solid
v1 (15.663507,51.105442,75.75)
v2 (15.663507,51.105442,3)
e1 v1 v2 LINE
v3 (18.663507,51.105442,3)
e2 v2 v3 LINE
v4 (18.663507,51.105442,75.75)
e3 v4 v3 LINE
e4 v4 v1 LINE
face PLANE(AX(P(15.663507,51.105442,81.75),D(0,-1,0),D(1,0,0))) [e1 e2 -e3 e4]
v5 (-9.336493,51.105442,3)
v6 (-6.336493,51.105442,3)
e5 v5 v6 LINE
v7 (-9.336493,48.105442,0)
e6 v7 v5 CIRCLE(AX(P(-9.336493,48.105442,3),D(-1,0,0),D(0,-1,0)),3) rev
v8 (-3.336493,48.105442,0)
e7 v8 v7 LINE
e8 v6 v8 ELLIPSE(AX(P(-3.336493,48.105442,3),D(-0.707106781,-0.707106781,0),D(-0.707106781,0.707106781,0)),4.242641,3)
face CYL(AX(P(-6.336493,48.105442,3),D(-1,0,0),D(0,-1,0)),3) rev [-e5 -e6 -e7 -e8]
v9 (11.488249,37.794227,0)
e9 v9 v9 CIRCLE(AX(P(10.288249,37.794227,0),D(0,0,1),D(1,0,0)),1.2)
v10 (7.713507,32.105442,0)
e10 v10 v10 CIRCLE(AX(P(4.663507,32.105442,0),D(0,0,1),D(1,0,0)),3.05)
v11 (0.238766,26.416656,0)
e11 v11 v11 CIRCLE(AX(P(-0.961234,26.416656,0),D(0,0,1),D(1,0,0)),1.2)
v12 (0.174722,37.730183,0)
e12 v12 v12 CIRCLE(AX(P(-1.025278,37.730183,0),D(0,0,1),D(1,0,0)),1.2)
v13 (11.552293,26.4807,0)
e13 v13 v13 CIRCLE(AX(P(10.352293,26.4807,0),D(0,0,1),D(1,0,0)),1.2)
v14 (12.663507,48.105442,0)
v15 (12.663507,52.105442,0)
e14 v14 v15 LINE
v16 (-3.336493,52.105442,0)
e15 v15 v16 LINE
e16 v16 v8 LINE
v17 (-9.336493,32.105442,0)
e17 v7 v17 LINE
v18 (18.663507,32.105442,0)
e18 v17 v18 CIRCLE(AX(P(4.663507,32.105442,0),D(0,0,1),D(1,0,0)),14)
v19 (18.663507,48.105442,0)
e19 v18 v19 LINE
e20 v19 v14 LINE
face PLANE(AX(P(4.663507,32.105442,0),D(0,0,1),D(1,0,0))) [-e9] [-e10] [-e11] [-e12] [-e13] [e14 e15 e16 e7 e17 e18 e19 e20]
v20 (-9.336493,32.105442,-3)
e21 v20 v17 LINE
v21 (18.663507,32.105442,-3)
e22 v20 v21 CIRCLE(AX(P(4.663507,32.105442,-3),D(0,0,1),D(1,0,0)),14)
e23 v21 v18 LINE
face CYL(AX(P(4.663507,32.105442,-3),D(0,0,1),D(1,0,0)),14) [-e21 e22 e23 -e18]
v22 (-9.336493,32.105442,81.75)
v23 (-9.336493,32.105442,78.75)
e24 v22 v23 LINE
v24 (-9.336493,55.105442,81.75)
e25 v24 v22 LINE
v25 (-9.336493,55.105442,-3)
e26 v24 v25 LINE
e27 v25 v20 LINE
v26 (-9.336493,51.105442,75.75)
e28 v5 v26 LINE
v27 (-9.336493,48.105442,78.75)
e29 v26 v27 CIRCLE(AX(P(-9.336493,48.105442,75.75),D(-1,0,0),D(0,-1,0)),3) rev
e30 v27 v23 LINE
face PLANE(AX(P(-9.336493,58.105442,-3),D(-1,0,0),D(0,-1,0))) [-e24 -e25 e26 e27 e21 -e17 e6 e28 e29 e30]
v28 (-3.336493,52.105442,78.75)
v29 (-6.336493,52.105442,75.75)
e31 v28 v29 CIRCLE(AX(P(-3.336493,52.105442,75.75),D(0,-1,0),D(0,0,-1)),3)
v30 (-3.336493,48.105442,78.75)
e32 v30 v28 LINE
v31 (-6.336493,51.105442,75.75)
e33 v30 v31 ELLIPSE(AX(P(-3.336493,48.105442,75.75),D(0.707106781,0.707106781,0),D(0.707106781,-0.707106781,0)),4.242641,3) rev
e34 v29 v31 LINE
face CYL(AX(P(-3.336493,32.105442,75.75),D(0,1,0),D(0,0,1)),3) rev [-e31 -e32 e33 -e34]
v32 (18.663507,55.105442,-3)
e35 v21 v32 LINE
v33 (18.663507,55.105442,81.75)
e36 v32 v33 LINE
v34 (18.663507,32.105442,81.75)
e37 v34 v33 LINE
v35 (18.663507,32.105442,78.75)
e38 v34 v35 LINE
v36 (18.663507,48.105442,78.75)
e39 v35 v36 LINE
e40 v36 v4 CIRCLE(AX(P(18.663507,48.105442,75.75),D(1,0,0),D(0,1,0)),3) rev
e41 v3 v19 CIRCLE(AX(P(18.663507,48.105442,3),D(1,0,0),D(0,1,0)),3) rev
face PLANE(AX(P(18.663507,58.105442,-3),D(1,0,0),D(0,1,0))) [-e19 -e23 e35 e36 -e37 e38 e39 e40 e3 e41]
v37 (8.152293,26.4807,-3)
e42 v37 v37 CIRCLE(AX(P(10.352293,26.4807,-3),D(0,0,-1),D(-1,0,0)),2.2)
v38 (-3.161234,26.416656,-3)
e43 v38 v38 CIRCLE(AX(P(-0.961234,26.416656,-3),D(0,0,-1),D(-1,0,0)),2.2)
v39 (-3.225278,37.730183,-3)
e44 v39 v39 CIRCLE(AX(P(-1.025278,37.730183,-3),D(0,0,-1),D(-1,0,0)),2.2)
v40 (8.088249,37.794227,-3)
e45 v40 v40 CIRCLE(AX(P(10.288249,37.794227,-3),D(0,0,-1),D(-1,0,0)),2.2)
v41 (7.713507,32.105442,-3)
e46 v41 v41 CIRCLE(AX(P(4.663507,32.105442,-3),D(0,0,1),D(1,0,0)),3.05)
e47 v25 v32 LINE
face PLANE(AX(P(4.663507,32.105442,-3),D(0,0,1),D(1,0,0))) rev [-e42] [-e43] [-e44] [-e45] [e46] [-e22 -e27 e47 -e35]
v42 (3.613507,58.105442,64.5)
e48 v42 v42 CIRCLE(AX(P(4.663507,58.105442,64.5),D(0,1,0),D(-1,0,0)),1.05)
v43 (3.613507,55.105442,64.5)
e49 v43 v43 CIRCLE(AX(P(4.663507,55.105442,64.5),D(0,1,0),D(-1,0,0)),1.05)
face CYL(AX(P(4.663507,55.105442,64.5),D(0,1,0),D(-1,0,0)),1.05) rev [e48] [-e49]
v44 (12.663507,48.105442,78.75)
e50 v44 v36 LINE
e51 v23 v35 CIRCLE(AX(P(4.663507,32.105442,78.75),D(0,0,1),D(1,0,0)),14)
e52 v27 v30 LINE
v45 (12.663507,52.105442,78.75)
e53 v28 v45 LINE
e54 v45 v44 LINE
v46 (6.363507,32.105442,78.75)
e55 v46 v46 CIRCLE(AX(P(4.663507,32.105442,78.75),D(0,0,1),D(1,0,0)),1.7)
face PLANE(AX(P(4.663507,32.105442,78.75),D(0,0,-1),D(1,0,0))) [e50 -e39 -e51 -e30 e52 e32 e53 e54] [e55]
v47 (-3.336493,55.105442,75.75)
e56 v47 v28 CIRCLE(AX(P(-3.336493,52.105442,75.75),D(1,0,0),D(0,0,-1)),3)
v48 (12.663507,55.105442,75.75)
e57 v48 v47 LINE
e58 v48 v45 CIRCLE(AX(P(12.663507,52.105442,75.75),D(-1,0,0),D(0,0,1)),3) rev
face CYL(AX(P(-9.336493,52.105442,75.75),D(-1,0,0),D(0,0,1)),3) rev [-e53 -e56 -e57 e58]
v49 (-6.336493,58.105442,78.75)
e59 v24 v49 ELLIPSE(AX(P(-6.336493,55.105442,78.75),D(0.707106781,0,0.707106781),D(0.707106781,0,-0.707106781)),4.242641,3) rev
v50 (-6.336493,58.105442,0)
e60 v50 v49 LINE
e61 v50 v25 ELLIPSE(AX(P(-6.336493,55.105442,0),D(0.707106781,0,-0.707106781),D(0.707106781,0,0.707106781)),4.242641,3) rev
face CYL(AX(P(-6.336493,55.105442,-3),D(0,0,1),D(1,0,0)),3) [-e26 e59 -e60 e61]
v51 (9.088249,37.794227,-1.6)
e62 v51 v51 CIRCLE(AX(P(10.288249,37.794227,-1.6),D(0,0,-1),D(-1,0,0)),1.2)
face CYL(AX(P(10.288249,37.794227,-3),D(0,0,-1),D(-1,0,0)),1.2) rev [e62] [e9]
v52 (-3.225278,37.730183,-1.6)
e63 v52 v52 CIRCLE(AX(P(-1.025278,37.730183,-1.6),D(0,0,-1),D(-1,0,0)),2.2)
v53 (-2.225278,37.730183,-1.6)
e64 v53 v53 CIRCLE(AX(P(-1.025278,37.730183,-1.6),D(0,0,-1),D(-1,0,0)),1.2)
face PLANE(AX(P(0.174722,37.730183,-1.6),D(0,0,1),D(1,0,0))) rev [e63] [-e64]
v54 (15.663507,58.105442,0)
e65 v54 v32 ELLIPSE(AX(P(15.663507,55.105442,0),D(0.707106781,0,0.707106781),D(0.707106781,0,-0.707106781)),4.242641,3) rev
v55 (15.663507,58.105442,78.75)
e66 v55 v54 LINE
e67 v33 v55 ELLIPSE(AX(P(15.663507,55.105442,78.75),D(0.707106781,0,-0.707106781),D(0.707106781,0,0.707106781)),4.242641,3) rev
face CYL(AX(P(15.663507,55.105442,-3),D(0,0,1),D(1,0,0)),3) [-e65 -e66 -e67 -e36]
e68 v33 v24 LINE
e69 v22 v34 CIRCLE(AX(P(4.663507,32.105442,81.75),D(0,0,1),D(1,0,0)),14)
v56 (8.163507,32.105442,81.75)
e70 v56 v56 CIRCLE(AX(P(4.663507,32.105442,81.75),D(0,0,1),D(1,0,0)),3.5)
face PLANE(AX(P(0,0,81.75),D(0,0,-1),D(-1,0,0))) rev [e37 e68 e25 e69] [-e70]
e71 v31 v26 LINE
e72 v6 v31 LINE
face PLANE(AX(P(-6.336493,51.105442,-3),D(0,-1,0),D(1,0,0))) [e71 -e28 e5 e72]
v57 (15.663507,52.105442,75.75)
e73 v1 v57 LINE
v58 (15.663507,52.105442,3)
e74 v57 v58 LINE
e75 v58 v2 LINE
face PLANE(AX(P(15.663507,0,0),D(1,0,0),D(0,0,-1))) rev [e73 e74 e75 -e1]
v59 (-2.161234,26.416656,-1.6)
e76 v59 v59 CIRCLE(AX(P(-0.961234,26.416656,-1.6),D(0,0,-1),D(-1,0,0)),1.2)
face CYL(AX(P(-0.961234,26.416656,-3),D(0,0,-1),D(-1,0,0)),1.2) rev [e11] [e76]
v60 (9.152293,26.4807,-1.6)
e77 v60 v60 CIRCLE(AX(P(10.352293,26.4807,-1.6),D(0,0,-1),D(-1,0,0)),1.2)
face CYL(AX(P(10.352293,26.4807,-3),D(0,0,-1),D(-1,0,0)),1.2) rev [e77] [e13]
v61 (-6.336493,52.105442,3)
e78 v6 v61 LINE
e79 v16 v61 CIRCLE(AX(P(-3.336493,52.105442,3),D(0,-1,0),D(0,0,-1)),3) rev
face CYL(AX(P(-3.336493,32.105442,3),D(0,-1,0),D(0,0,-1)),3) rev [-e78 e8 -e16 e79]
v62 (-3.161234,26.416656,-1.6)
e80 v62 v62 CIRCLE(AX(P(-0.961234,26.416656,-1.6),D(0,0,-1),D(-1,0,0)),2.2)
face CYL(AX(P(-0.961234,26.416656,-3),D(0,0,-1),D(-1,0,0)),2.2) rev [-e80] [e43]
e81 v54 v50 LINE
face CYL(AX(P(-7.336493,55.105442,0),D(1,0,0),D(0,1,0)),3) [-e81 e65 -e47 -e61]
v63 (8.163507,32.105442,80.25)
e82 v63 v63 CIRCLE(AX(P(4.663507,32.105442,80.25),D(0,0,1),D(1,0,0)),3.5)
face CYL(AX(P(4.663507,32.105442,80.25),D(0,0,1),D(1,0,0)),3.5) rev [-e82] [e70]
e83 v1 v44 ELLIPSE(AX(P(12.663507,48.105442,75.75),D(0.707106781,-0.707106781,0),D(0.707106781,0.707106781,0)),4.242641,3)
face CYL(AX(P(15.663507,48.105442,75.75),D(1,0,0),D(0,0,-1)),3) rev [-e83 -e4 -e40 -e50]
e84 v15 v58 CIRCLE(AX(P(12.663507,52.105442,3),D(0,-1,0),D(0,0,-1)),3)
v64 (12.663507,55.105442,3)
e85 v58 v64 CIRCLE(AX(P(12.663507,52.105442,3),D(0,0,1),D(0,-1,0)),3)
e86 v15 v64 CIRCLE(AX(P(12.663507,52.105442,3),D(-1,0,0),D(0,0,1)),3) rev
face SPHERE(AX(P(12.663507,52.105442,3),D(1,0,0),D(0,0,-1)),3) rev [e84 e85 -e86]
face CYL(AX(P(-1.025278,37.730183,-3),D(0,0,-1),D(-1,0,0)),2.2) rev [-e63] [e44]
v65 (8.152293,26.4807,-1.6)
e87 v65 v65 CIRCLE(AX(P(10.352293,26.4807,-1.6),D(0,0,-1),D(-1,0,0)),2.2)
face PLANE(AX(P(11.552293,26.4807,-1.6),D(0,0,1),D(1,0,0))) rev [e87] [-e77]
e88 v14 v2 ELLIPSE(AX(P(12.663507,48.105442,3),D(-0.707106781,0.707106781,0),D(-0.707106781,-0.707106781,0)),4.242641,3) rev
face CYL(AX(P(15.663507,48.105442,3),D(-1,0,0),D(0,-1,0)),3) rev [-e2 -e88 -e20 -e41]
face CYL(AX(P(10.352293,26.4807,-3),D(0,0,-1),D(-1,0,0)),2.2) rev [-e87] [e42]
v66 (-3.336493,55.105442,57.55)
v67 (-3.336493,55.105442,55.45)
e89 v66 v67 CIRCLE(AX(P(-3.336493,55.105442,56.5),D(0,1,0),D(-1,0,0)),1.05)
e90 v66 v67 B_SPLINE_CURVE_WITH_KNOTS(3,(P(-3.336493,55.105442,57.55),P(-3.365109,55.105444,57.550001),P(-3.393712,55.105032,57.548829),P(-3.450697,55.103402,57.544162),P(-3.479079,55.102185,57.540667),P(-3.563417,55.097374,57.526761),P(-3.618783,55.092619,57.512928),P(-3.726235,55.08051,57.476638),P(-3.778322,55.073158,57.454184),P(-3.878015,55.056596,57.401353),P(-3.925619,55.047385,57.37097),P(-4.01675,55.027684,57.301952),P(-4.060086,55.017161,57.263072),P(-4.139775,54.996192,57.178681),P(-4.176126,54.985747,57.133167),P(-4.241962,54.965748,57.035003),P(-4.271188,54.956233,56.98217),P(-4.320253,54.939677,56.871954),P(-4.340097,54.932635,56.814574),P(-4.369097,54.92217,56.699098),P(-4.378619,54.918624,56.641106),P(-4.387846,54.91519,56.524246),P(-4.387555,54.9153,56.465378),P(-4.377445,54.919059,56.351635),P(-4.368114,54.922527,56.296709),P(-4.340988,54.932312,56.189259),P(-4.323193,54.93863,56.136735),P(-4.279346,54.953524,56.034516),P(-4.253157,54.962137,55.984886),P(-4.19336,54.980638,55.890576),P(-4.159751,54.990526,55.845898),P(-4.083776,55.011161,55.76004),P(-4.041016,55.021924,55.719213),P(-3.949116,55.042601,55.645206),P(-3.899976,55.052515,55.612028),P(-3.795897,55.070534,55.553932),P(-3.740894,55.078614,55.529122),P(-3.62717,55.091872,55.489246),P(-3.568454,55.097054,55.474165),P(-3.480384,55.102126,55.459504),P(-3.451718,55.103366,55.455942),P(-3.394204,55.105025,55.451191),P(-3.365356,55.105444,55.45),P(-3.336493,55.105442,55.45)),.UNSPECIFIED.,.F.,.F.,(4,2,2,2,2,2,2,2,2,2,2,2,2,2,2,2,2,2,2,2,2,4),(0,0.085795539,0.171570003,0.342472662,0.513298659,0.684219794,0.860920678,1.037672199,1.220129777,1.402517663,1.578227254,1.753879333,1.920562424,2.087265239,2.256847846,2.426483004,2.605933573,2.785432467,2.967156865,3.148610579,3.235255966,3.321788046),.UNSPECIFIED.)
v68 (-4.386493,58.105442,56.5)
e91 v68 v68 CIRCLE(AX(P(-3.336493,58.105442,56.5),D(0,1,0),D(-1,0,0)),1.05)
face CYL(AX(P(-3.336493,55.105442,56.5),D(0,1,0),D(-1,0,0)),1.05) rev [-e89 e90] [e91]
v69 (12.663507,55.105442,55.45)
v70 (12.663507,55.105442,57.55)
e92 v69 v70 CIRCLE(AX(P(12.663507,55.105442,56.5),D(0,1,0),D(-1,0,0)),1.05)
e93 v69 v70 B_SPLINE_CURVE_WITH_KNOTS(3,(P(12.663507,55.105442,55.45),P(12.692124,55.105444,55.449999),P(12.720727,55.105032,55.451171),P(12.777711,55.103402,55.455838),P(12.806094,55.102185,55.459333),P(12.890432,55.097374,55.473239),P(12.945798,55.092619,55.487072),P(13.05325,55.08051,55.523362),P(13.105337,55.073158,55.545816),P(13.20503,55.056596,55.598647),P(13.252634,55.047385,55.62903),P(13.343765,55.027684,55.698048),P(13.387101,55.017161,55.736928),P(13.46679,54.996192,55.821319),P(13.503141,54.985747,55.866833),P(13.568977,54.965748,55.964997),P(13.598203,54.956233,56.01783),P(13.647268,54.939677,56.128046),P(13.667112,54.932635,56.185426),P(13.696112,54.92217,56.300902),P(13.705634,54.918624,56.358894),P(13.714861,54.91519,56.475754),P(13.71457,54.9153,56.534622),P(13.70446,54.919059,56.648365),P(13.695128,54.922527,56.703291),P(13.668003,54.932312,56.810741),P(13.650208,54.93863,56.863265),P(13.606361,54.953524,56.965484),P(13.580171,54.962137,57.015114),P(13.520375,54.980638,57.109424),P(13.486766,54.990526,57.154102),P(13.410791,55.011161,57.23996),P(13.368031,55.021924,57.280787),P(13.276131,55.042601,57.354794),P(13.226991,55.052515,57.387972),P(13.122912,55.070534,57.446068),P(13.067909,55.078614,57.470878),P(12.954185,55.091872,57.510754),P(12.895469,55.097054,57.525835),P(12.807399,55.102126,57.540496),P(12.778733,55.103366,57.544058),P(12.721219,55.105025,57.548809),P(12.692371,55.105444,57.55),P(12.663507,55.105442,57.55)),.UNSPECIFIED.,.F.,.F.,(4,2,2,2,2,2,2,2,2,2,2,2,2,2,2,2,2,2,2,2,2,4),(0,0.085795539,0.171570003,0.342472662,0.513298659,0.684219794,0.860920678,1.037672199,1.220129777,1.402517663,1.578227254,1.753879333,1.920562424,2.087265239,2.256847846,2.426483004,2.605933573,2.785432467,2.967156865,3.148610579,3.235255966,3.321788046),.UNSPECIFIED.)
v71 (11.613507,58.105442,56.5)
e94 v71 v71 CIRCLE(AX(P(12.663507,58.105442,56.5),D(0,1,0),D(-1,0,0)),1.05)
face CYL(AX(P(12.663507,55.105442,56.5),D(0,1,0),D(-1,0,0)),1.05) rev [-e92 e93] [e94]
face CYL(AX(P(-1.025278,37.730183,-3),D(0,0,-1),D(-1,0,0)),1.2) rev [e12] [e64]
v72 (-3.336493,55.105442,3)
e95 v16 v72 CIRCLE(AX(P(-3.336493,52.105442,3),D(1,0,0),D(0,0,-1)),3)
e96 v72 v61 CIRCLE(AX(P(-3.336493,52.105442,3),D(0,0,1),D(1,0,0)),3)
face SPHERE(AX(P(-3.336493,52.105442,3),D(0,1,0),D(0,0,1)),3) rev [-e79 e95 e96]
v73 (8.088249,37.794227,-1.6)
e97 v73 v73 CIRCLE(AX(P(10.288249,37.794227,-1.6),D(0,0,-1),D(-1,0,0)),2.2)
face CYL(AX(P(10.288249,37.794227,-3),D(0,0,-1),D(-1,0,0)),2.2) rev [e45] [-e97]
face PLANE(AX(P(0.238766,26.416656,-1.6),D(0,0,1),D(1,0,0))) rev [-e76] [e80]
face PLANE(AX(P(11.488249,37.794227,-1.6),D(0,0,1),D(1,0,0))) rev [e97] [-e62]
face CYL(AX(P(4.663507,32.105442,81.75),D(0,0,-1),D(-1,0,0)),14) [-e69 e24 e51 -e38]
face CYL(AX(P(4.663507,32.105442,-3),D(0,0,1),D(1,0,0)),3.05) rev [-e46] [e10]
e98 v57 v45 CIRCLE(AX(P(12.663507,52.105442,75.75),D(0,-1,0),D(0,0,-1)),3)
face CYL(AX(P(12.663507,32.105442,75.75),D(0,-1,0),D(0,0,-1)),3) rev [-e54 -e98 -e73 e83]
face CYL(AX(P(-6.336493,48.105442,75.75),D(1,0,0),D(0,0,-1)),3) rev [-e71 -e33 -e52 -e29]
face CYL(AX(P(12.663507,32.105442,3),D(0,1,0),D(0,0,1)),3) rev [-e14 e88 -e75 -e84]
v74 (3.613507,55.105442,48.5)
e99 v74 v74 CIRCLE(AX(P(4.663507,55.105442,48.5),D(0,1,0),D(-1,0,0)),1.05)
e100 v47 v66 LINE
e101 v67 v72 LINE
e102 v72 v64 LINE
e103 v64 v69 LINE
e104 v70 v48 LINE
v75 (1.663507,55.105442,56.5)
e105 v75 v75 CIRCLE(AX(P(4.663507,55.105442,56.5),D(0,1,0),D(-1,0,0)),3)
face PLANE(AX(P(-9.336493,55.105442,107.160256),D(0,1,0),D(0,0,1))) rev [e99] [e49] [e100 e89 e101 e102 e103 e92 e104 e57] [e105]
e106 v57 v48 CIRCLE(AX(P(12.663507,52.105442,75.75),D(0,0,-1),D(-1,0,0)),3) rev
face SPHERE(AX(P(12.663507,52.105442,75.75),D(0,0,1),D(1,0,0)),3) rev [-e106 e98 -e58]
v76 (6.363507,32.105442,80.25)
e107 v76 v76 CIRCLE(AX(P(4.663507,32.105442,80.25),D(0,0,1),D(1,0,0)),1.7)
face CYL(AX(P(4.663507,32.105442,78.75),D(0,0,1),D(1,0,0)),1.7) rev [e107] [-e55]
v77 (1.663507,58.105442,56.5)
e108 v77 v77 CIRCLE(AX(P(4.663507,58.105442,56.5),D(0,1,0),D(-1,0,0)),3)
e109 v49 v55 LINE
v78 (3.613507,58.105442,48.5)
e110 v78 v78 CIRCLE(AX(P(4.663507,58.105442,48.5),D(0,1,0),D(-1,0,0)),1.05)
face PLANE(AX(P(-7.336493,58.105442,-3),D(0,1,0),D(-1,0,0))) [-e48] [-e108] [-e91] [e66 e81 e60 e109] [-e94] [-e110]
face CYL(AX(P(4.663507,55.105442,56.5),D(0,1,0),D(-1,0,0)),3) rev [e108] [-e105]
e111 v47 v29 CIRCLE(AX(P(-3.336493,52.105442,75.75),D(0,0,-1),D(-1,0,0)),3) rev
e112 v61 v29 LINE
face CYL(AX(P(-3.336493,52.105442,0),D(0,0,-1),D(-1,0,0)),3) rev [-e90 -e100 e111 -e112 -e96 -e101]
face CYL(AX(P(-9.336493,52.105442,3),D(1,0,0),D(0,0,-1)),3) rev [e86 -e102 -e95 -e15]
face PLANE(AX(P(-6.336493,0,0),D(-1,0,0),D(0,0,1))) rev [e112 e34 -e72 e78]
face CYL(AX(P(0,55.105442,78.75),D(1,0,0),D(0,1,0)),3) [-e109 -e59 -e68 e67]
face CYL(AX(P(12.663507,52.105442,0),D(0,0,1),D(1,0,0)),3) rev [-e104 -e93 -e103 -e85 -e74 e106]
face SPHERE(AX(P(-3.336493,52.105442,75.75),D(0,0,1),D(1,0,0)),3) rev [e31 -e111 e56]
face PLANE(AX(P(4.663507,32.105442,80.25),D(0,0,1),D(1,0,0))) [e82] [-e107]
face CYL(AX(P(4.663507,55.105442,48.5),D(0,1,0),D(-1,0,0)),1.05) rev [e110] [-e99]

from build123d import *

# Parameters (mm, degrees)
ESBO_O1_R                                            = 3.05
RESSALTO_EXTRUS_O1_DEPTH                             = 3
REBAIXO_PARA_PARAFUSO_COM_CABE_A_REDONDA_D           = 2.4
REBAIXO_PARA_PARAFUSO_COM_CABE_A_REDONDA_CBORE_D     = 4.4
REBAIXO_PARA_PARAFUSO_COM_CABE_A_REDONDA_CBORE_DEPTH = 1.4
PADR_OCIRCULAR1_COUNT                                = 4
SKETCH6_W                                            = 28
SKETCH6_H                                            = 3
BOSS_EXTRUDE2_DEPTH                                  = 78.75
SKETCH8_W                                            = 28
SKETCH8_H                                            = 3
BOSS_EXTRUDE3_DEPTH                                  = 3
SKETCH10_R                                           = 3.05
BOSS_EXTRUDE4_DEPTH                                  = 3
SKETCH12_R                                           = 3.5
CUT_EXTRUDE3_DEPTH                                   = 1.5
SKETCH13_R                                           = 1.7
CUT_EXTRUDE4_DEPTH                                   = 1.5
SKETCH15_R                                           = 1.05
SKETCH15_R_2                                         = 3
CUT_EXTRUDE5_DEPTH                                   = 3
ESBO_O12_W                                           = 84.75
ESBO_O12_H                                           = 7
RESSALTO_EXTRUS_O2_DEPTH                             = 3
ESBO_O13_W                                           = 84.75
ESBO_O13_H                                           = 7
RESSALTO_EXTRUS_O3_DEPTH                             = 3
FILLET2_R                                            = 3


with BuildPart() as part:
    # Esboço1 → Ressalto-extrusão1 (new body)
    with BuildSketch(Plane.XY):
        with BuildLine():
            Line((16.663507, 58.105442), (-7.336493, 58.105442))
            Line((-7.336493, 58.105442), (-9.336493, 58.105442))
            Line((-9.336493, 58.105442), (-9.336493, 32.105442))
            ThreePointArc((-9.336493, 32.105442), (4.663507, 18.105442), (18.663507, 32.105442))
            Line((18.663507, 32.105442), (18.663507, 58.105442))
            Line((18.663507, 58.105442), (16.663507, 58.105442))
        make_face()
        with Locations((4.663507, 32.105442)):
            Circle(ESBO_O1_R, mode=Mode.SUBTRACT)
    ressalto_extrus_o1 = extrude(amount=-RESSALTO_EXTRUS_O1_DEPTH)

    # Rebaixo para parafuso com cabeça redonda de M21 (through all)
    with Locations(Plane(origin=(0, 0, -3), x_dir=(-1, 0, 0), z_dir=(0, 0, -1))):
        with Locations((-10.288249, 37.794227)):
            rebaixo_para_parafuso_com_cabe_a_redonda = CounterBoreHole(REBAIXO_PARA_PARAFUSO_COM_CABE_A_REDONDA_D / 2, REBAIXO_PARA_PARAFUSO_COM_CABE_A_REDONDA_CBORE_D / 2, REBAIXO_PARA_PARAFUSO_COM_CABE_A_REDONDA_CBORE_DEPTH)

    # PadrãoCircular1: Rebaixo para parafuso com cabeça redonda de M21 ×4 about axis
    padr_ocircular1_axis = Axis((4.663507, 32.105442, 0), (0, 0, 1))
    for i in range(1, PADR_OCIRCULAR1_COUNT):
        add(rebaixo_para_parafuso_com_cabe_a_redonda.rotate(padr_ocircular1_axis, i * 360 / PADR_OCIRCULAR1_COUNT), mode=Mode.SUBTRACT)

    # Sketch6 → Boss-Extrude2 (add)
    with BuildSketch(Plane.XY):
        with Locations((4.663507, 56.605442)):
            Rectangle(SKETCH6_W, SKETCH6_H)
    extrude(amount=BOSS_EXTRUDE2_DEPTH)

    # Sketch8 → Boss-Extrude3 (add)
    with BuildSketch(Plane.XY.offset(78.75)):
        with Locations((4.663507, 56.605442)):
            Rectangle(SKETCH8_W, SKETCH8_H)
    extrude(amount=BOSS_EXTRUDE3_DEPTH)

    # Mirror1: Ressalto-extrusão1 across plane
    add(ressalto_extrus_o1.mirror(Plane(origin=(0, 0, 39.375), x_dir=(1, 0, 0), z_dir=(0, 0, -1))))

    # Sketch10 → Boss-Extrude4 (add)
    with BuildSketch(Plane.XY.offset(81.75)):
        with Locations((4.663507, 32.105442)):
            Circle(SKETCH10_R)
    extrude(amount=-BOSS_EXTRUDE4_DEPTH)

    # Sketch12 → Cut-Extrude3 (cut)
    with BuildSketch(Plane.XY.offset(81.75)):
        with Locations((4.663507, 32.105442)):
            Circle(SKETCH12_R)
    extrude(amount=-CUT_EXTRUDE3_DEPTH, mode=Mode.SUBTRACT)

    # Sketch13 → Cut-Extrude4 (cut)
    with BuildSketch(Plane.XY.offset(80.25)):
        with Locations((4.663507, 32.105442)):
            Circle(SKETCH13_R)
    extrude(amount=-CUT_EXTRUDE4_DEPTH, mode=Mode.SUBTRACT)

    # Sketch15 → Cut-Extrude5 (cut)
    with BuildSketch(Plane(origin=(0, 58.105442, 0), x_dir=(1, 0, 0), z_dir=(0, 1, 0))):
        with Locations(Location((4.663507, -64.5, 0), (0, 0, 180))):
            Circle(SKETCH15_R)
        with Locations(Location((-3.336493, -56.5, 0), (0, 0, 180))):
            Circle(SKETCH15_R)
        with Locations(Location((4.663507, -48.5, 0), (0, 0, 180))):
            Circle(SKETCH15_R)
        with Locations(Location((12.663507, -56.5, 0), (0, 0, 180))):
            Circle(SKETCH15_R)
        with Locations(Location((4.663507, -56.5, 0), (0, 0, 180))):
            Circle(SKETCH15_R_2)
    extrude(amount=-CUT_EXTRUDE5_DEPTH, mode=Mode.SUBTRACT)

    # Esboço12 → Ressalto-extrusão2 (add)
    with BuildSketch(Plane.ZY.offset(9.336493)):
        with Locations((39.375, 54.605442)):
            Rectangle(ESBO_O12_W, ESBO_O12_H)
    extrude(amount=-RESSALTO_EXTRUS_O2_DEPTH)

    # Esboço13 → Ressalto-extrusão3 (add)
    with BuildSketch(Plane(origin=(18.663507, 0, 0), x_dir=(0, 0, -1), z_dir=(1, 0, 0))):
        with Locations((-39.375, 54.605442)):
            Rectangle(ESBO_O13_W, ESBO_O13_H)
    extrude(amount=-RESSALTO_EXTRUS_O3_DEPTH)

    # Fillet2
    # the kernel refuses this fillet: 3 mm, written as the material it adds along each edge
    with BuildSketch(Plane(origin=(-3.336493, 52.105442, 75.75), x_dir=(-1, 0, 0), z_dir=(0, 1, 0))) as fillet2_piece_1_section:
        Polygon((0, 0), (FILLET2_R, 0), (FILLET2_R, FILLET2_R), (0, FILLET2_R), align=None)
    fillet2_piece_1 = extrude(amount=FILLET2_R, mode=Mode.PRIVATE)
    fillet2_piece_1 = fillet2_piece_1 - Plane(origin=(-3.336493, 52.105442, 75.75), x_dir=(0.7071067811865477, 0, -0.7071067811865475), z_dir=(0, 1, 0)) * Sphere(FILLET2_R, mode=Mode.PRIVATE)
    add(fillet2_piece_1)
    with BuildSketch(Plane(origin=(-3.336493, 52.105442, 3), x_dir=(-1, 0, 0), z_dir=(0, 1, 0))) as fillet2_piece_2_section:
        Polygon((0, 0), (FILLET2_R, 0), (FILLET2_R, -FILLET2_R), (0, -FILLET2_R), align=None)
    fillet2_piece_2 = extrude(amount=FILLET2_R, mode=Mode.PRIVATE)
    fillet2_piece_2 = fillet2_piece_2 - Plane(origin=(-3.336493, 52.105442, 3), x_dir=(0.7071067811865475, 0, 0.7071067811865475), z_dir=(0, 1, 0)) * Sphere(FILLET2_R, mode=Mode.PRIVATE)
    add(fillet2_piece_2)
    with BuildSketch(Plane(origin=(12.663507, 52.105442, 3), x_dir=(1, 0, 0), z_dir=(0, 1, 0))) as fillet2_piece_3_section:
        Polygon((0, 0), (FILLET2_R, 0), (FILLET2_R, FILLET2_R), (0, FILLET2_R), align=None)
    fillet2_piece_3 = extrude(amount=FILLET2_R, mode=Mode.PRIVATE)
    fillet2_piece_3 = fillet2_piece_3 - Plane(origin=(12.663507, 52.105442, 3), x_dir=(-0.7071067811865475, 0, 0.7071067811865475), z_dir=(0, 1, 0)) * Sphere(FILLET2_R, mode=Mode.PRIVATE)
    add(fillet2_piece_3)
    with BuildSketch(Plane(origin=(12.663507, 52.105442, 75.75), x_dir=(1, 0, 0), z_dir=(0, 1, 0))) as fillet2_piece_4_section:
        Polygon((0, 0), (FILLET2_R, 0), (FILLET2_R, -FILLET2_R), (0, -FILLET2_R), align=None)
    fillet2_piece_4 = extrude(amount=FILLET2_R, mode=Mode.PRIVATE)
    fillet2_piece_4 = fillet2_piece_4 - Plane(origin=(12.663507, 52.105442, 75.75), x_dir=(-0.7071067811865475, 0, -0.7071067811865476), z_dir=(0, 1, 0)) * Sphere(FILLET2_R, mode=Mode.PRIVATE)
    add(fillet2_piece_4)
    with BuildSketch(Plane(origin=(-6.336493, 51.105442, 78.75), x_dir=(0, 0, -1), z_dir=(0, 1, 0))) as fillet2_piece_5:
        with BuildLine():
            CenterArc((FILLET2_R, -FILLET2_R), FILLET2_R, 90, 90)
            Line((0, -FILLET2_R), (0, 0))
            Line((0, 0), (FILLET2_R, 0))
        make_face()
    extrude(amount=1)
    with BuildSketch(Plane(origin=(-6.336493, 51.105442, 78.75), x_dir=(0, 0, -1), z_dir=(-1, 0, 0))) as fillet2_piece_6:
        with BuildLine():
            CenterArc((FILLET2_R, FILLET2_R), FILLET2_R, 180, 90)
            Line((0, FILLET2_R), (0, 0))
            Line((0, 0), (FILLET2_R, 0))
        make_face()
    extrude(amount=3)
    with BuildSketch(Plane(origin=(-3.336493, 55.105442, 0), x_dir=(0, 0, 1), z_dir=(1, 0, 0))) as fillet2_piece_7:
        with BuildLine():
            CenterArc((FILLET2_R, FILLET2_R), FILLET2_R, 180, 90)
            Line((0, FILLET2_R), (0, 0))
            Line((0, 0), (FILLET2_R, 0))
        make_face()
    extrude(amount=16)
    with BuildSketch(Plane(origin=(-6.336493, 51.105442, 0), x_dir=(0, 0, 1), z_dir=(0, 1, 0)), Plane(origin=(15.663507, 52.105442, 78.75), x_dir=(-1, 0, 0), z_dir=(0, -1, 0)), Plane(origin=(15.663507, 52.105442, 0), x_dir=(0, 0, 1), z_dir=(0, -1, 0))) as fillet2_piece_8:
        with BuildLine():
            CenterArc((FILLET2_R, FILLET2_R), FILLET2_R, 180, 90)
            Line((0, FILLET2_R), (0, 0))
            Line((0, 0), (FILLET2_R, 0))
        make_face()
    extrude(amount=1)
    with BuildSketch(Plane(origin=(-6.336493, 51.105442, 0), x_dir=(0, 0, 1), z_dir=(-1, 0, 0)), Plane(origin=(18.663507, 51.105442, 78.75), x_dir=(0, -1, 0), z_dir=(-1, 0, 0)), Plane(origin=(18.663507, 51.105442, 0), x_dir=(0, 0, 1), z_dir=(-1, 0, 0))) as fillet2_piece_9:
        with BuildLine():
            CenterArc((FILLET2_R, -FILLET2_R), FILLET2_R, 90, 90)
            Line((0, -FILLET2_R), (0, 0))
            Line((0, 0), (FILLET2_R, 0))
        make_face()
    extrude(amount=3)
    with BuildSketch(Plane(origin=(-6.336493, 55.105442, 75.75), x_dir=(1, 0, 0), z_dir=(0, 0, -1))) as fillet2_piece_10_section:
        with BuildLine():
            CenterArc((FILLET2_R, FILLET2_R), FILLET2_R, 180, 90)
            Line((0, FILLET2_R), (0, 0))
            Line((0, 0), (FILLET2_R, 0))
        make_face()
    fillet2_piece_10 = extrude(amount=72.75, mode=Mode.PRIVATE)
    fillet2_piece_10 = fillet2_piece_10 - Plane(origin=(-3.336493, 54.425508, 56.5), x_dir=(-1, 0, 0), z_dir=(0, 1, 0)) * Cylinder(1.05, 158, mode=Mode.PRIVATE)
    add(fillet2_piece_10)
    with BuildSketch(Plane(origin=(-3.336493, 55.105442, 78.75), x_dir=(0, 0, -1), z_dir=(1, 0, 0))) as fillet2_piece_11:
        with BuildLine():
            CenterArc((FILLET2_R, -FILLET2_R), FILLET2_R, 90, 90)
            Line((0, -FILLET2_R), (0, 0))
            Line((0, 0), (FILLET2_R, 0))
        make_face()
    extrude(amount=16)
    with BuildSketch(Plane(origin=(15.663507, 55.105442, 3), x_dir=(-1, 0, 0), z_dir=(0, 0, 1))) as fillet2_piece_12_section:
        with BuildLine():
            CenterArc((FILLET2_R, FILLET2_R), FILLET2_R, 180, 90)
            Line((0, FILLET2_R), (0, 0))
            Line((0, 0), (FILLET2_R, 0))
        make_face()
    fillet2_piece_12 = extrude(amount=72.75, mode=Mode.PRIVATE)
    fillet2_piece_12 = fillet2_piece_12 - Plane(origin=(12.663507, 54.425508, 56.5), x_dir=(-1, 0, 0), z_dir=(0, 1, 0)) * Cylinder(1.05, 158, mode=Mode.PRIVATE)
    add(fillet2_piece_12)
    with BuildSketch(Plane(origin=(-6.336493, 43.605442, 78.75), x_dir=(0, 0, -1), z_dir=(0, 1, 0))) as fillet2_piece_13a_section:
        with BuildLine():
            CenterArc((FILLET2_R, -FILLET2_R), FILLET2_R, 90, 90)
            Line((0, -FILLET2_R), (0, 0))
            Line((0, 0), (FILLET2_R, 0))
        make_face()
    fillet2_piece_13a = extrude(amount=8.5, mode=Mode.PRIVATE)
    fillet2_piece_13a = split(fillet2_piece_13a, bisect_by=Plane(origin=(-5.657307, 51.105442, 78.070815), z_dir=(0, -1, 0)), keep=Keep.TOP, mode=Mode.PRIVATE)
    with BuildSketch(Plane(origin=(1.163507, 51.105442, 78.75), x_dir=(0, 0, -1), z_dir=(-1, 0, 0))) as fillet2_piece_13b_section:
        with BuildLine():
            CenterArc((FILLET2_R, FILLET2_R), FILLET2_R, 180, 90)
            Line((0, FILLET2_R), (0, 0))
            Line((0, 0), (FILLET2_R, 0))
        make_face()
    fillet2_piece_13b = extrude(amount=10.5, mode=Mode.PRIVATE)
    fillet2_piece_13b = split(fillet2_piece_13b, bisect_by=Plane(origin=(-6.336493, 50.426256, 78.070815), z_dir=(1, 0, 0)), keep=Keep.TOP, mode=Mode.PRIVATE)
    fillet2_piece_13 = fillet2_piece_13a & fillet2_piece_13b
    add(fillet2_piece_13)
    with BuildSketch(Plane(origin=(-6.336493, 43.605442, 0), x_dir=(0, 0, 1), z_dir=(0, 1, 0))) as fillet2_piece_14a_section:
        with BuildLine():
            CenterArc((FILLET2_R, FILLET2_R), FILLET2_R, 180, 90)
            Line((0, FILLET2_R), (0, 0))
            Line((0, 0), (FILLET2_R, 0))
        make_face()
    fillet2_piece_14a = extrude(amount=8.5, mode=Mode.PRIVATE)
    fillet2_piece_14a = split(fillet2_piece_14a, bisect_by=Plane(origin=(-5.657307, 51.105442, 0.679185), z_dir=(0, -1, 0)), keep=Keep.TOP, mode=Mode.PRIVATE)
    with BuildSketch(Plane(origin=(1.163507, 51.105442, 0), x_dir=(0, 0, 1), z_dir=(-1, 0, 0))) as fillet2_piece_14b_section:
        with BuildLine():
            CenterArc((FILLET2_R, -FILLET2_R), FILLET2_R, 90, 90)
            Line((0, -FILLET2_R), (0, 0))
            Line((0, 0), (FILLET2_R, 0))
        make_face()
    fillet2_piece_14b = extrude(amount=10.5, mode=Mode.PRIVATE)
    fillet2_piece_14b = split(fillet2_piece_14b, bisect_by=Plane(origin=(-6.336493, 50.426256, 0.679185), z_dir=(1, 0, 0)), keep=Keep.TOP, mode=Mode.PRIVATE)
    fillet2_piece_14 = fillet2_piece_14a & fillet2_piece_14b
    add(fillet2_piece_14)
    with BuildSketch(Plane(origin=(15.663507, 52.105442, 78.75), x_dir=(-1, 0, 0), z_dir=(0, -1, 0))) as fillet2_piece_15a_section:
        with BuildLine():
            CenterArc((FILLET2_R, FILLET2_R), FILLET2_R, 180, 90)
            Line((0, FILLET2_R), (0, 0))
            Line((0, 0), (FILLET2_R, 0))
        make_face()
    fillet2_piece_15a = extrude(amount=8.5, mode=Mode.PRIVATE)
    fillet2_piece_15a = split(fillet2_piece_15a, bisect_by=Plane(origin=(14.984322, 51.105442, 78.070815), z_dir=(0, -1, 0)), keep=Keep.TOP, mode=Mode.PRIVATE)
    with BuildSketch(Plane(origin=(18.663507, 51.105442, 78.75), x_dir=(0, -1, 0), z_dir=(-1, 0, 0))) as fillet2_piece_15b_section:
        with BuildLine():
            CenterArc((FILLET2_R, -FILLET2_R), FILLET2_R, 90, 90)
            Line((0, -FILLET2_R), (0, 0))
            Line((0, 0), (FILLET2_R, 0))
        make_face()
    fillet2_piece_15b = extrude(amount=10.5, mode=Mode.PRIVATE)
    fillet2_piece_15b = split(fillet2_piece_15b, bisect_by=Plane(origin=(15.663507, 50.426256, 78.070815), z_dir=(-1, 0, 0)), keep=Keep.TOP, mode=Mode.PRIVATE)
    fillet2_piece_15 = fillet2_piece_15a & fillet2_piece_15b
    add(fillet2_piece_15)
    with BuildSketch(Plane(origin=(18.663507, 51.105442, 0), x_dir=(0, 0, 1), z_dir=(-1, 0, 0))) as fillet2_piece_16a_section:
        with BuildLine():
            CenterArc((FILLET2_R, -FILLET2_R), FILLET2_R, 90, 90)
            Line((0, -FILLET2_R), (0, 0))
            Line((0, 0), (FILLET2_R, 0))
        make_face()
    fillet2_piece_16a = extrude(amount=10.5, mode=Mode.PRIVATE)
    fillet2_piece_16a = split(fillet2_piece_16a, bisect_by=Plane(origin=(15.663507, 50.426256, 0.679185), z_dir=(-1, 0, 0)), keep=Keep.TOP, mode=Mode.PRIVATE)
    with BuildSketch(Plane(origin=(15.663507, 52.105442, 0), x_dir=(0, 0, 1), z_dir=(0, -1, 0))) as fillet2_piece_16b_section:
        with BuildLine():
            CenterArc((FILLET2_R, FILLET2_R), FILLET2_R, 180, 90)
            Line((0, FILLET2_R), (0, 0))
            Line((0, 0), (FILLET2_R, 0))
        make_face()
    fillet2_piece_16b = extrude(amount=8.5, mode=Mode.PRIVATE)
    fillet2_piece_16b = split(fillet2_piece_16b, bisect_by=Plane(origin=(14.984322, 51.105442, 0.679185), z_dir=(0, -1, 0)), keep=Keep.TOP, mode=Mode.PRIVATE)
    fillet2_piece_16 = fillet2_piece_16a & fillet2_piece_16b
    add(fillet2_piece_16)
    # the kernel refuses this fillet: 3 mm, written as the material it takes off along each edge
    with BuildSketch(Plane(origin=(-9.336493, 58.105442, -10.5), x_dir=(1, 0, 0), z_dir=(0, 0, 1)), Plane(origin=(18.663507, 58.105442, 89.25), x_dir=(-1, 0, 0), z_dir=(0, 0, -1))) as fillet2_2_piece_1:
        with BuildLine():
            CenterArc((FILLET2_R, -FILLET2_R), FILLET2_R, 90, 90)
            Line((0, -FILLET2_R), (0, 0))
            Line((0, 0), (FILLET2_R, 0))
        make_face()
    extrude(amount=99.75, mode=Mode.SUBTRACT)
    with BuildSketch(Plane(origin=(26.163507, 58.105442, -3), x_dir=(0, 0, 1), z_dir=(-1, 0, 0)), Plane(origin=(-16.836493, 58.105442, 81.75), x_dir=(0, 0, -1), z_dir=(1, 0, 0))) as fillet2_2_piece_2:
        with BuildLine():
            CenterArc((FILLET2_R, -FILLET2_R), FILLET2_R, 90, 90)
            Line((0, -FILLET2_R), (0, 0))
            Line((0, 0), (FILLET2_R, 0))
        make_face()
    extrude(amount=43, mode=Mode.SUBTRACT)


solid = part.part
